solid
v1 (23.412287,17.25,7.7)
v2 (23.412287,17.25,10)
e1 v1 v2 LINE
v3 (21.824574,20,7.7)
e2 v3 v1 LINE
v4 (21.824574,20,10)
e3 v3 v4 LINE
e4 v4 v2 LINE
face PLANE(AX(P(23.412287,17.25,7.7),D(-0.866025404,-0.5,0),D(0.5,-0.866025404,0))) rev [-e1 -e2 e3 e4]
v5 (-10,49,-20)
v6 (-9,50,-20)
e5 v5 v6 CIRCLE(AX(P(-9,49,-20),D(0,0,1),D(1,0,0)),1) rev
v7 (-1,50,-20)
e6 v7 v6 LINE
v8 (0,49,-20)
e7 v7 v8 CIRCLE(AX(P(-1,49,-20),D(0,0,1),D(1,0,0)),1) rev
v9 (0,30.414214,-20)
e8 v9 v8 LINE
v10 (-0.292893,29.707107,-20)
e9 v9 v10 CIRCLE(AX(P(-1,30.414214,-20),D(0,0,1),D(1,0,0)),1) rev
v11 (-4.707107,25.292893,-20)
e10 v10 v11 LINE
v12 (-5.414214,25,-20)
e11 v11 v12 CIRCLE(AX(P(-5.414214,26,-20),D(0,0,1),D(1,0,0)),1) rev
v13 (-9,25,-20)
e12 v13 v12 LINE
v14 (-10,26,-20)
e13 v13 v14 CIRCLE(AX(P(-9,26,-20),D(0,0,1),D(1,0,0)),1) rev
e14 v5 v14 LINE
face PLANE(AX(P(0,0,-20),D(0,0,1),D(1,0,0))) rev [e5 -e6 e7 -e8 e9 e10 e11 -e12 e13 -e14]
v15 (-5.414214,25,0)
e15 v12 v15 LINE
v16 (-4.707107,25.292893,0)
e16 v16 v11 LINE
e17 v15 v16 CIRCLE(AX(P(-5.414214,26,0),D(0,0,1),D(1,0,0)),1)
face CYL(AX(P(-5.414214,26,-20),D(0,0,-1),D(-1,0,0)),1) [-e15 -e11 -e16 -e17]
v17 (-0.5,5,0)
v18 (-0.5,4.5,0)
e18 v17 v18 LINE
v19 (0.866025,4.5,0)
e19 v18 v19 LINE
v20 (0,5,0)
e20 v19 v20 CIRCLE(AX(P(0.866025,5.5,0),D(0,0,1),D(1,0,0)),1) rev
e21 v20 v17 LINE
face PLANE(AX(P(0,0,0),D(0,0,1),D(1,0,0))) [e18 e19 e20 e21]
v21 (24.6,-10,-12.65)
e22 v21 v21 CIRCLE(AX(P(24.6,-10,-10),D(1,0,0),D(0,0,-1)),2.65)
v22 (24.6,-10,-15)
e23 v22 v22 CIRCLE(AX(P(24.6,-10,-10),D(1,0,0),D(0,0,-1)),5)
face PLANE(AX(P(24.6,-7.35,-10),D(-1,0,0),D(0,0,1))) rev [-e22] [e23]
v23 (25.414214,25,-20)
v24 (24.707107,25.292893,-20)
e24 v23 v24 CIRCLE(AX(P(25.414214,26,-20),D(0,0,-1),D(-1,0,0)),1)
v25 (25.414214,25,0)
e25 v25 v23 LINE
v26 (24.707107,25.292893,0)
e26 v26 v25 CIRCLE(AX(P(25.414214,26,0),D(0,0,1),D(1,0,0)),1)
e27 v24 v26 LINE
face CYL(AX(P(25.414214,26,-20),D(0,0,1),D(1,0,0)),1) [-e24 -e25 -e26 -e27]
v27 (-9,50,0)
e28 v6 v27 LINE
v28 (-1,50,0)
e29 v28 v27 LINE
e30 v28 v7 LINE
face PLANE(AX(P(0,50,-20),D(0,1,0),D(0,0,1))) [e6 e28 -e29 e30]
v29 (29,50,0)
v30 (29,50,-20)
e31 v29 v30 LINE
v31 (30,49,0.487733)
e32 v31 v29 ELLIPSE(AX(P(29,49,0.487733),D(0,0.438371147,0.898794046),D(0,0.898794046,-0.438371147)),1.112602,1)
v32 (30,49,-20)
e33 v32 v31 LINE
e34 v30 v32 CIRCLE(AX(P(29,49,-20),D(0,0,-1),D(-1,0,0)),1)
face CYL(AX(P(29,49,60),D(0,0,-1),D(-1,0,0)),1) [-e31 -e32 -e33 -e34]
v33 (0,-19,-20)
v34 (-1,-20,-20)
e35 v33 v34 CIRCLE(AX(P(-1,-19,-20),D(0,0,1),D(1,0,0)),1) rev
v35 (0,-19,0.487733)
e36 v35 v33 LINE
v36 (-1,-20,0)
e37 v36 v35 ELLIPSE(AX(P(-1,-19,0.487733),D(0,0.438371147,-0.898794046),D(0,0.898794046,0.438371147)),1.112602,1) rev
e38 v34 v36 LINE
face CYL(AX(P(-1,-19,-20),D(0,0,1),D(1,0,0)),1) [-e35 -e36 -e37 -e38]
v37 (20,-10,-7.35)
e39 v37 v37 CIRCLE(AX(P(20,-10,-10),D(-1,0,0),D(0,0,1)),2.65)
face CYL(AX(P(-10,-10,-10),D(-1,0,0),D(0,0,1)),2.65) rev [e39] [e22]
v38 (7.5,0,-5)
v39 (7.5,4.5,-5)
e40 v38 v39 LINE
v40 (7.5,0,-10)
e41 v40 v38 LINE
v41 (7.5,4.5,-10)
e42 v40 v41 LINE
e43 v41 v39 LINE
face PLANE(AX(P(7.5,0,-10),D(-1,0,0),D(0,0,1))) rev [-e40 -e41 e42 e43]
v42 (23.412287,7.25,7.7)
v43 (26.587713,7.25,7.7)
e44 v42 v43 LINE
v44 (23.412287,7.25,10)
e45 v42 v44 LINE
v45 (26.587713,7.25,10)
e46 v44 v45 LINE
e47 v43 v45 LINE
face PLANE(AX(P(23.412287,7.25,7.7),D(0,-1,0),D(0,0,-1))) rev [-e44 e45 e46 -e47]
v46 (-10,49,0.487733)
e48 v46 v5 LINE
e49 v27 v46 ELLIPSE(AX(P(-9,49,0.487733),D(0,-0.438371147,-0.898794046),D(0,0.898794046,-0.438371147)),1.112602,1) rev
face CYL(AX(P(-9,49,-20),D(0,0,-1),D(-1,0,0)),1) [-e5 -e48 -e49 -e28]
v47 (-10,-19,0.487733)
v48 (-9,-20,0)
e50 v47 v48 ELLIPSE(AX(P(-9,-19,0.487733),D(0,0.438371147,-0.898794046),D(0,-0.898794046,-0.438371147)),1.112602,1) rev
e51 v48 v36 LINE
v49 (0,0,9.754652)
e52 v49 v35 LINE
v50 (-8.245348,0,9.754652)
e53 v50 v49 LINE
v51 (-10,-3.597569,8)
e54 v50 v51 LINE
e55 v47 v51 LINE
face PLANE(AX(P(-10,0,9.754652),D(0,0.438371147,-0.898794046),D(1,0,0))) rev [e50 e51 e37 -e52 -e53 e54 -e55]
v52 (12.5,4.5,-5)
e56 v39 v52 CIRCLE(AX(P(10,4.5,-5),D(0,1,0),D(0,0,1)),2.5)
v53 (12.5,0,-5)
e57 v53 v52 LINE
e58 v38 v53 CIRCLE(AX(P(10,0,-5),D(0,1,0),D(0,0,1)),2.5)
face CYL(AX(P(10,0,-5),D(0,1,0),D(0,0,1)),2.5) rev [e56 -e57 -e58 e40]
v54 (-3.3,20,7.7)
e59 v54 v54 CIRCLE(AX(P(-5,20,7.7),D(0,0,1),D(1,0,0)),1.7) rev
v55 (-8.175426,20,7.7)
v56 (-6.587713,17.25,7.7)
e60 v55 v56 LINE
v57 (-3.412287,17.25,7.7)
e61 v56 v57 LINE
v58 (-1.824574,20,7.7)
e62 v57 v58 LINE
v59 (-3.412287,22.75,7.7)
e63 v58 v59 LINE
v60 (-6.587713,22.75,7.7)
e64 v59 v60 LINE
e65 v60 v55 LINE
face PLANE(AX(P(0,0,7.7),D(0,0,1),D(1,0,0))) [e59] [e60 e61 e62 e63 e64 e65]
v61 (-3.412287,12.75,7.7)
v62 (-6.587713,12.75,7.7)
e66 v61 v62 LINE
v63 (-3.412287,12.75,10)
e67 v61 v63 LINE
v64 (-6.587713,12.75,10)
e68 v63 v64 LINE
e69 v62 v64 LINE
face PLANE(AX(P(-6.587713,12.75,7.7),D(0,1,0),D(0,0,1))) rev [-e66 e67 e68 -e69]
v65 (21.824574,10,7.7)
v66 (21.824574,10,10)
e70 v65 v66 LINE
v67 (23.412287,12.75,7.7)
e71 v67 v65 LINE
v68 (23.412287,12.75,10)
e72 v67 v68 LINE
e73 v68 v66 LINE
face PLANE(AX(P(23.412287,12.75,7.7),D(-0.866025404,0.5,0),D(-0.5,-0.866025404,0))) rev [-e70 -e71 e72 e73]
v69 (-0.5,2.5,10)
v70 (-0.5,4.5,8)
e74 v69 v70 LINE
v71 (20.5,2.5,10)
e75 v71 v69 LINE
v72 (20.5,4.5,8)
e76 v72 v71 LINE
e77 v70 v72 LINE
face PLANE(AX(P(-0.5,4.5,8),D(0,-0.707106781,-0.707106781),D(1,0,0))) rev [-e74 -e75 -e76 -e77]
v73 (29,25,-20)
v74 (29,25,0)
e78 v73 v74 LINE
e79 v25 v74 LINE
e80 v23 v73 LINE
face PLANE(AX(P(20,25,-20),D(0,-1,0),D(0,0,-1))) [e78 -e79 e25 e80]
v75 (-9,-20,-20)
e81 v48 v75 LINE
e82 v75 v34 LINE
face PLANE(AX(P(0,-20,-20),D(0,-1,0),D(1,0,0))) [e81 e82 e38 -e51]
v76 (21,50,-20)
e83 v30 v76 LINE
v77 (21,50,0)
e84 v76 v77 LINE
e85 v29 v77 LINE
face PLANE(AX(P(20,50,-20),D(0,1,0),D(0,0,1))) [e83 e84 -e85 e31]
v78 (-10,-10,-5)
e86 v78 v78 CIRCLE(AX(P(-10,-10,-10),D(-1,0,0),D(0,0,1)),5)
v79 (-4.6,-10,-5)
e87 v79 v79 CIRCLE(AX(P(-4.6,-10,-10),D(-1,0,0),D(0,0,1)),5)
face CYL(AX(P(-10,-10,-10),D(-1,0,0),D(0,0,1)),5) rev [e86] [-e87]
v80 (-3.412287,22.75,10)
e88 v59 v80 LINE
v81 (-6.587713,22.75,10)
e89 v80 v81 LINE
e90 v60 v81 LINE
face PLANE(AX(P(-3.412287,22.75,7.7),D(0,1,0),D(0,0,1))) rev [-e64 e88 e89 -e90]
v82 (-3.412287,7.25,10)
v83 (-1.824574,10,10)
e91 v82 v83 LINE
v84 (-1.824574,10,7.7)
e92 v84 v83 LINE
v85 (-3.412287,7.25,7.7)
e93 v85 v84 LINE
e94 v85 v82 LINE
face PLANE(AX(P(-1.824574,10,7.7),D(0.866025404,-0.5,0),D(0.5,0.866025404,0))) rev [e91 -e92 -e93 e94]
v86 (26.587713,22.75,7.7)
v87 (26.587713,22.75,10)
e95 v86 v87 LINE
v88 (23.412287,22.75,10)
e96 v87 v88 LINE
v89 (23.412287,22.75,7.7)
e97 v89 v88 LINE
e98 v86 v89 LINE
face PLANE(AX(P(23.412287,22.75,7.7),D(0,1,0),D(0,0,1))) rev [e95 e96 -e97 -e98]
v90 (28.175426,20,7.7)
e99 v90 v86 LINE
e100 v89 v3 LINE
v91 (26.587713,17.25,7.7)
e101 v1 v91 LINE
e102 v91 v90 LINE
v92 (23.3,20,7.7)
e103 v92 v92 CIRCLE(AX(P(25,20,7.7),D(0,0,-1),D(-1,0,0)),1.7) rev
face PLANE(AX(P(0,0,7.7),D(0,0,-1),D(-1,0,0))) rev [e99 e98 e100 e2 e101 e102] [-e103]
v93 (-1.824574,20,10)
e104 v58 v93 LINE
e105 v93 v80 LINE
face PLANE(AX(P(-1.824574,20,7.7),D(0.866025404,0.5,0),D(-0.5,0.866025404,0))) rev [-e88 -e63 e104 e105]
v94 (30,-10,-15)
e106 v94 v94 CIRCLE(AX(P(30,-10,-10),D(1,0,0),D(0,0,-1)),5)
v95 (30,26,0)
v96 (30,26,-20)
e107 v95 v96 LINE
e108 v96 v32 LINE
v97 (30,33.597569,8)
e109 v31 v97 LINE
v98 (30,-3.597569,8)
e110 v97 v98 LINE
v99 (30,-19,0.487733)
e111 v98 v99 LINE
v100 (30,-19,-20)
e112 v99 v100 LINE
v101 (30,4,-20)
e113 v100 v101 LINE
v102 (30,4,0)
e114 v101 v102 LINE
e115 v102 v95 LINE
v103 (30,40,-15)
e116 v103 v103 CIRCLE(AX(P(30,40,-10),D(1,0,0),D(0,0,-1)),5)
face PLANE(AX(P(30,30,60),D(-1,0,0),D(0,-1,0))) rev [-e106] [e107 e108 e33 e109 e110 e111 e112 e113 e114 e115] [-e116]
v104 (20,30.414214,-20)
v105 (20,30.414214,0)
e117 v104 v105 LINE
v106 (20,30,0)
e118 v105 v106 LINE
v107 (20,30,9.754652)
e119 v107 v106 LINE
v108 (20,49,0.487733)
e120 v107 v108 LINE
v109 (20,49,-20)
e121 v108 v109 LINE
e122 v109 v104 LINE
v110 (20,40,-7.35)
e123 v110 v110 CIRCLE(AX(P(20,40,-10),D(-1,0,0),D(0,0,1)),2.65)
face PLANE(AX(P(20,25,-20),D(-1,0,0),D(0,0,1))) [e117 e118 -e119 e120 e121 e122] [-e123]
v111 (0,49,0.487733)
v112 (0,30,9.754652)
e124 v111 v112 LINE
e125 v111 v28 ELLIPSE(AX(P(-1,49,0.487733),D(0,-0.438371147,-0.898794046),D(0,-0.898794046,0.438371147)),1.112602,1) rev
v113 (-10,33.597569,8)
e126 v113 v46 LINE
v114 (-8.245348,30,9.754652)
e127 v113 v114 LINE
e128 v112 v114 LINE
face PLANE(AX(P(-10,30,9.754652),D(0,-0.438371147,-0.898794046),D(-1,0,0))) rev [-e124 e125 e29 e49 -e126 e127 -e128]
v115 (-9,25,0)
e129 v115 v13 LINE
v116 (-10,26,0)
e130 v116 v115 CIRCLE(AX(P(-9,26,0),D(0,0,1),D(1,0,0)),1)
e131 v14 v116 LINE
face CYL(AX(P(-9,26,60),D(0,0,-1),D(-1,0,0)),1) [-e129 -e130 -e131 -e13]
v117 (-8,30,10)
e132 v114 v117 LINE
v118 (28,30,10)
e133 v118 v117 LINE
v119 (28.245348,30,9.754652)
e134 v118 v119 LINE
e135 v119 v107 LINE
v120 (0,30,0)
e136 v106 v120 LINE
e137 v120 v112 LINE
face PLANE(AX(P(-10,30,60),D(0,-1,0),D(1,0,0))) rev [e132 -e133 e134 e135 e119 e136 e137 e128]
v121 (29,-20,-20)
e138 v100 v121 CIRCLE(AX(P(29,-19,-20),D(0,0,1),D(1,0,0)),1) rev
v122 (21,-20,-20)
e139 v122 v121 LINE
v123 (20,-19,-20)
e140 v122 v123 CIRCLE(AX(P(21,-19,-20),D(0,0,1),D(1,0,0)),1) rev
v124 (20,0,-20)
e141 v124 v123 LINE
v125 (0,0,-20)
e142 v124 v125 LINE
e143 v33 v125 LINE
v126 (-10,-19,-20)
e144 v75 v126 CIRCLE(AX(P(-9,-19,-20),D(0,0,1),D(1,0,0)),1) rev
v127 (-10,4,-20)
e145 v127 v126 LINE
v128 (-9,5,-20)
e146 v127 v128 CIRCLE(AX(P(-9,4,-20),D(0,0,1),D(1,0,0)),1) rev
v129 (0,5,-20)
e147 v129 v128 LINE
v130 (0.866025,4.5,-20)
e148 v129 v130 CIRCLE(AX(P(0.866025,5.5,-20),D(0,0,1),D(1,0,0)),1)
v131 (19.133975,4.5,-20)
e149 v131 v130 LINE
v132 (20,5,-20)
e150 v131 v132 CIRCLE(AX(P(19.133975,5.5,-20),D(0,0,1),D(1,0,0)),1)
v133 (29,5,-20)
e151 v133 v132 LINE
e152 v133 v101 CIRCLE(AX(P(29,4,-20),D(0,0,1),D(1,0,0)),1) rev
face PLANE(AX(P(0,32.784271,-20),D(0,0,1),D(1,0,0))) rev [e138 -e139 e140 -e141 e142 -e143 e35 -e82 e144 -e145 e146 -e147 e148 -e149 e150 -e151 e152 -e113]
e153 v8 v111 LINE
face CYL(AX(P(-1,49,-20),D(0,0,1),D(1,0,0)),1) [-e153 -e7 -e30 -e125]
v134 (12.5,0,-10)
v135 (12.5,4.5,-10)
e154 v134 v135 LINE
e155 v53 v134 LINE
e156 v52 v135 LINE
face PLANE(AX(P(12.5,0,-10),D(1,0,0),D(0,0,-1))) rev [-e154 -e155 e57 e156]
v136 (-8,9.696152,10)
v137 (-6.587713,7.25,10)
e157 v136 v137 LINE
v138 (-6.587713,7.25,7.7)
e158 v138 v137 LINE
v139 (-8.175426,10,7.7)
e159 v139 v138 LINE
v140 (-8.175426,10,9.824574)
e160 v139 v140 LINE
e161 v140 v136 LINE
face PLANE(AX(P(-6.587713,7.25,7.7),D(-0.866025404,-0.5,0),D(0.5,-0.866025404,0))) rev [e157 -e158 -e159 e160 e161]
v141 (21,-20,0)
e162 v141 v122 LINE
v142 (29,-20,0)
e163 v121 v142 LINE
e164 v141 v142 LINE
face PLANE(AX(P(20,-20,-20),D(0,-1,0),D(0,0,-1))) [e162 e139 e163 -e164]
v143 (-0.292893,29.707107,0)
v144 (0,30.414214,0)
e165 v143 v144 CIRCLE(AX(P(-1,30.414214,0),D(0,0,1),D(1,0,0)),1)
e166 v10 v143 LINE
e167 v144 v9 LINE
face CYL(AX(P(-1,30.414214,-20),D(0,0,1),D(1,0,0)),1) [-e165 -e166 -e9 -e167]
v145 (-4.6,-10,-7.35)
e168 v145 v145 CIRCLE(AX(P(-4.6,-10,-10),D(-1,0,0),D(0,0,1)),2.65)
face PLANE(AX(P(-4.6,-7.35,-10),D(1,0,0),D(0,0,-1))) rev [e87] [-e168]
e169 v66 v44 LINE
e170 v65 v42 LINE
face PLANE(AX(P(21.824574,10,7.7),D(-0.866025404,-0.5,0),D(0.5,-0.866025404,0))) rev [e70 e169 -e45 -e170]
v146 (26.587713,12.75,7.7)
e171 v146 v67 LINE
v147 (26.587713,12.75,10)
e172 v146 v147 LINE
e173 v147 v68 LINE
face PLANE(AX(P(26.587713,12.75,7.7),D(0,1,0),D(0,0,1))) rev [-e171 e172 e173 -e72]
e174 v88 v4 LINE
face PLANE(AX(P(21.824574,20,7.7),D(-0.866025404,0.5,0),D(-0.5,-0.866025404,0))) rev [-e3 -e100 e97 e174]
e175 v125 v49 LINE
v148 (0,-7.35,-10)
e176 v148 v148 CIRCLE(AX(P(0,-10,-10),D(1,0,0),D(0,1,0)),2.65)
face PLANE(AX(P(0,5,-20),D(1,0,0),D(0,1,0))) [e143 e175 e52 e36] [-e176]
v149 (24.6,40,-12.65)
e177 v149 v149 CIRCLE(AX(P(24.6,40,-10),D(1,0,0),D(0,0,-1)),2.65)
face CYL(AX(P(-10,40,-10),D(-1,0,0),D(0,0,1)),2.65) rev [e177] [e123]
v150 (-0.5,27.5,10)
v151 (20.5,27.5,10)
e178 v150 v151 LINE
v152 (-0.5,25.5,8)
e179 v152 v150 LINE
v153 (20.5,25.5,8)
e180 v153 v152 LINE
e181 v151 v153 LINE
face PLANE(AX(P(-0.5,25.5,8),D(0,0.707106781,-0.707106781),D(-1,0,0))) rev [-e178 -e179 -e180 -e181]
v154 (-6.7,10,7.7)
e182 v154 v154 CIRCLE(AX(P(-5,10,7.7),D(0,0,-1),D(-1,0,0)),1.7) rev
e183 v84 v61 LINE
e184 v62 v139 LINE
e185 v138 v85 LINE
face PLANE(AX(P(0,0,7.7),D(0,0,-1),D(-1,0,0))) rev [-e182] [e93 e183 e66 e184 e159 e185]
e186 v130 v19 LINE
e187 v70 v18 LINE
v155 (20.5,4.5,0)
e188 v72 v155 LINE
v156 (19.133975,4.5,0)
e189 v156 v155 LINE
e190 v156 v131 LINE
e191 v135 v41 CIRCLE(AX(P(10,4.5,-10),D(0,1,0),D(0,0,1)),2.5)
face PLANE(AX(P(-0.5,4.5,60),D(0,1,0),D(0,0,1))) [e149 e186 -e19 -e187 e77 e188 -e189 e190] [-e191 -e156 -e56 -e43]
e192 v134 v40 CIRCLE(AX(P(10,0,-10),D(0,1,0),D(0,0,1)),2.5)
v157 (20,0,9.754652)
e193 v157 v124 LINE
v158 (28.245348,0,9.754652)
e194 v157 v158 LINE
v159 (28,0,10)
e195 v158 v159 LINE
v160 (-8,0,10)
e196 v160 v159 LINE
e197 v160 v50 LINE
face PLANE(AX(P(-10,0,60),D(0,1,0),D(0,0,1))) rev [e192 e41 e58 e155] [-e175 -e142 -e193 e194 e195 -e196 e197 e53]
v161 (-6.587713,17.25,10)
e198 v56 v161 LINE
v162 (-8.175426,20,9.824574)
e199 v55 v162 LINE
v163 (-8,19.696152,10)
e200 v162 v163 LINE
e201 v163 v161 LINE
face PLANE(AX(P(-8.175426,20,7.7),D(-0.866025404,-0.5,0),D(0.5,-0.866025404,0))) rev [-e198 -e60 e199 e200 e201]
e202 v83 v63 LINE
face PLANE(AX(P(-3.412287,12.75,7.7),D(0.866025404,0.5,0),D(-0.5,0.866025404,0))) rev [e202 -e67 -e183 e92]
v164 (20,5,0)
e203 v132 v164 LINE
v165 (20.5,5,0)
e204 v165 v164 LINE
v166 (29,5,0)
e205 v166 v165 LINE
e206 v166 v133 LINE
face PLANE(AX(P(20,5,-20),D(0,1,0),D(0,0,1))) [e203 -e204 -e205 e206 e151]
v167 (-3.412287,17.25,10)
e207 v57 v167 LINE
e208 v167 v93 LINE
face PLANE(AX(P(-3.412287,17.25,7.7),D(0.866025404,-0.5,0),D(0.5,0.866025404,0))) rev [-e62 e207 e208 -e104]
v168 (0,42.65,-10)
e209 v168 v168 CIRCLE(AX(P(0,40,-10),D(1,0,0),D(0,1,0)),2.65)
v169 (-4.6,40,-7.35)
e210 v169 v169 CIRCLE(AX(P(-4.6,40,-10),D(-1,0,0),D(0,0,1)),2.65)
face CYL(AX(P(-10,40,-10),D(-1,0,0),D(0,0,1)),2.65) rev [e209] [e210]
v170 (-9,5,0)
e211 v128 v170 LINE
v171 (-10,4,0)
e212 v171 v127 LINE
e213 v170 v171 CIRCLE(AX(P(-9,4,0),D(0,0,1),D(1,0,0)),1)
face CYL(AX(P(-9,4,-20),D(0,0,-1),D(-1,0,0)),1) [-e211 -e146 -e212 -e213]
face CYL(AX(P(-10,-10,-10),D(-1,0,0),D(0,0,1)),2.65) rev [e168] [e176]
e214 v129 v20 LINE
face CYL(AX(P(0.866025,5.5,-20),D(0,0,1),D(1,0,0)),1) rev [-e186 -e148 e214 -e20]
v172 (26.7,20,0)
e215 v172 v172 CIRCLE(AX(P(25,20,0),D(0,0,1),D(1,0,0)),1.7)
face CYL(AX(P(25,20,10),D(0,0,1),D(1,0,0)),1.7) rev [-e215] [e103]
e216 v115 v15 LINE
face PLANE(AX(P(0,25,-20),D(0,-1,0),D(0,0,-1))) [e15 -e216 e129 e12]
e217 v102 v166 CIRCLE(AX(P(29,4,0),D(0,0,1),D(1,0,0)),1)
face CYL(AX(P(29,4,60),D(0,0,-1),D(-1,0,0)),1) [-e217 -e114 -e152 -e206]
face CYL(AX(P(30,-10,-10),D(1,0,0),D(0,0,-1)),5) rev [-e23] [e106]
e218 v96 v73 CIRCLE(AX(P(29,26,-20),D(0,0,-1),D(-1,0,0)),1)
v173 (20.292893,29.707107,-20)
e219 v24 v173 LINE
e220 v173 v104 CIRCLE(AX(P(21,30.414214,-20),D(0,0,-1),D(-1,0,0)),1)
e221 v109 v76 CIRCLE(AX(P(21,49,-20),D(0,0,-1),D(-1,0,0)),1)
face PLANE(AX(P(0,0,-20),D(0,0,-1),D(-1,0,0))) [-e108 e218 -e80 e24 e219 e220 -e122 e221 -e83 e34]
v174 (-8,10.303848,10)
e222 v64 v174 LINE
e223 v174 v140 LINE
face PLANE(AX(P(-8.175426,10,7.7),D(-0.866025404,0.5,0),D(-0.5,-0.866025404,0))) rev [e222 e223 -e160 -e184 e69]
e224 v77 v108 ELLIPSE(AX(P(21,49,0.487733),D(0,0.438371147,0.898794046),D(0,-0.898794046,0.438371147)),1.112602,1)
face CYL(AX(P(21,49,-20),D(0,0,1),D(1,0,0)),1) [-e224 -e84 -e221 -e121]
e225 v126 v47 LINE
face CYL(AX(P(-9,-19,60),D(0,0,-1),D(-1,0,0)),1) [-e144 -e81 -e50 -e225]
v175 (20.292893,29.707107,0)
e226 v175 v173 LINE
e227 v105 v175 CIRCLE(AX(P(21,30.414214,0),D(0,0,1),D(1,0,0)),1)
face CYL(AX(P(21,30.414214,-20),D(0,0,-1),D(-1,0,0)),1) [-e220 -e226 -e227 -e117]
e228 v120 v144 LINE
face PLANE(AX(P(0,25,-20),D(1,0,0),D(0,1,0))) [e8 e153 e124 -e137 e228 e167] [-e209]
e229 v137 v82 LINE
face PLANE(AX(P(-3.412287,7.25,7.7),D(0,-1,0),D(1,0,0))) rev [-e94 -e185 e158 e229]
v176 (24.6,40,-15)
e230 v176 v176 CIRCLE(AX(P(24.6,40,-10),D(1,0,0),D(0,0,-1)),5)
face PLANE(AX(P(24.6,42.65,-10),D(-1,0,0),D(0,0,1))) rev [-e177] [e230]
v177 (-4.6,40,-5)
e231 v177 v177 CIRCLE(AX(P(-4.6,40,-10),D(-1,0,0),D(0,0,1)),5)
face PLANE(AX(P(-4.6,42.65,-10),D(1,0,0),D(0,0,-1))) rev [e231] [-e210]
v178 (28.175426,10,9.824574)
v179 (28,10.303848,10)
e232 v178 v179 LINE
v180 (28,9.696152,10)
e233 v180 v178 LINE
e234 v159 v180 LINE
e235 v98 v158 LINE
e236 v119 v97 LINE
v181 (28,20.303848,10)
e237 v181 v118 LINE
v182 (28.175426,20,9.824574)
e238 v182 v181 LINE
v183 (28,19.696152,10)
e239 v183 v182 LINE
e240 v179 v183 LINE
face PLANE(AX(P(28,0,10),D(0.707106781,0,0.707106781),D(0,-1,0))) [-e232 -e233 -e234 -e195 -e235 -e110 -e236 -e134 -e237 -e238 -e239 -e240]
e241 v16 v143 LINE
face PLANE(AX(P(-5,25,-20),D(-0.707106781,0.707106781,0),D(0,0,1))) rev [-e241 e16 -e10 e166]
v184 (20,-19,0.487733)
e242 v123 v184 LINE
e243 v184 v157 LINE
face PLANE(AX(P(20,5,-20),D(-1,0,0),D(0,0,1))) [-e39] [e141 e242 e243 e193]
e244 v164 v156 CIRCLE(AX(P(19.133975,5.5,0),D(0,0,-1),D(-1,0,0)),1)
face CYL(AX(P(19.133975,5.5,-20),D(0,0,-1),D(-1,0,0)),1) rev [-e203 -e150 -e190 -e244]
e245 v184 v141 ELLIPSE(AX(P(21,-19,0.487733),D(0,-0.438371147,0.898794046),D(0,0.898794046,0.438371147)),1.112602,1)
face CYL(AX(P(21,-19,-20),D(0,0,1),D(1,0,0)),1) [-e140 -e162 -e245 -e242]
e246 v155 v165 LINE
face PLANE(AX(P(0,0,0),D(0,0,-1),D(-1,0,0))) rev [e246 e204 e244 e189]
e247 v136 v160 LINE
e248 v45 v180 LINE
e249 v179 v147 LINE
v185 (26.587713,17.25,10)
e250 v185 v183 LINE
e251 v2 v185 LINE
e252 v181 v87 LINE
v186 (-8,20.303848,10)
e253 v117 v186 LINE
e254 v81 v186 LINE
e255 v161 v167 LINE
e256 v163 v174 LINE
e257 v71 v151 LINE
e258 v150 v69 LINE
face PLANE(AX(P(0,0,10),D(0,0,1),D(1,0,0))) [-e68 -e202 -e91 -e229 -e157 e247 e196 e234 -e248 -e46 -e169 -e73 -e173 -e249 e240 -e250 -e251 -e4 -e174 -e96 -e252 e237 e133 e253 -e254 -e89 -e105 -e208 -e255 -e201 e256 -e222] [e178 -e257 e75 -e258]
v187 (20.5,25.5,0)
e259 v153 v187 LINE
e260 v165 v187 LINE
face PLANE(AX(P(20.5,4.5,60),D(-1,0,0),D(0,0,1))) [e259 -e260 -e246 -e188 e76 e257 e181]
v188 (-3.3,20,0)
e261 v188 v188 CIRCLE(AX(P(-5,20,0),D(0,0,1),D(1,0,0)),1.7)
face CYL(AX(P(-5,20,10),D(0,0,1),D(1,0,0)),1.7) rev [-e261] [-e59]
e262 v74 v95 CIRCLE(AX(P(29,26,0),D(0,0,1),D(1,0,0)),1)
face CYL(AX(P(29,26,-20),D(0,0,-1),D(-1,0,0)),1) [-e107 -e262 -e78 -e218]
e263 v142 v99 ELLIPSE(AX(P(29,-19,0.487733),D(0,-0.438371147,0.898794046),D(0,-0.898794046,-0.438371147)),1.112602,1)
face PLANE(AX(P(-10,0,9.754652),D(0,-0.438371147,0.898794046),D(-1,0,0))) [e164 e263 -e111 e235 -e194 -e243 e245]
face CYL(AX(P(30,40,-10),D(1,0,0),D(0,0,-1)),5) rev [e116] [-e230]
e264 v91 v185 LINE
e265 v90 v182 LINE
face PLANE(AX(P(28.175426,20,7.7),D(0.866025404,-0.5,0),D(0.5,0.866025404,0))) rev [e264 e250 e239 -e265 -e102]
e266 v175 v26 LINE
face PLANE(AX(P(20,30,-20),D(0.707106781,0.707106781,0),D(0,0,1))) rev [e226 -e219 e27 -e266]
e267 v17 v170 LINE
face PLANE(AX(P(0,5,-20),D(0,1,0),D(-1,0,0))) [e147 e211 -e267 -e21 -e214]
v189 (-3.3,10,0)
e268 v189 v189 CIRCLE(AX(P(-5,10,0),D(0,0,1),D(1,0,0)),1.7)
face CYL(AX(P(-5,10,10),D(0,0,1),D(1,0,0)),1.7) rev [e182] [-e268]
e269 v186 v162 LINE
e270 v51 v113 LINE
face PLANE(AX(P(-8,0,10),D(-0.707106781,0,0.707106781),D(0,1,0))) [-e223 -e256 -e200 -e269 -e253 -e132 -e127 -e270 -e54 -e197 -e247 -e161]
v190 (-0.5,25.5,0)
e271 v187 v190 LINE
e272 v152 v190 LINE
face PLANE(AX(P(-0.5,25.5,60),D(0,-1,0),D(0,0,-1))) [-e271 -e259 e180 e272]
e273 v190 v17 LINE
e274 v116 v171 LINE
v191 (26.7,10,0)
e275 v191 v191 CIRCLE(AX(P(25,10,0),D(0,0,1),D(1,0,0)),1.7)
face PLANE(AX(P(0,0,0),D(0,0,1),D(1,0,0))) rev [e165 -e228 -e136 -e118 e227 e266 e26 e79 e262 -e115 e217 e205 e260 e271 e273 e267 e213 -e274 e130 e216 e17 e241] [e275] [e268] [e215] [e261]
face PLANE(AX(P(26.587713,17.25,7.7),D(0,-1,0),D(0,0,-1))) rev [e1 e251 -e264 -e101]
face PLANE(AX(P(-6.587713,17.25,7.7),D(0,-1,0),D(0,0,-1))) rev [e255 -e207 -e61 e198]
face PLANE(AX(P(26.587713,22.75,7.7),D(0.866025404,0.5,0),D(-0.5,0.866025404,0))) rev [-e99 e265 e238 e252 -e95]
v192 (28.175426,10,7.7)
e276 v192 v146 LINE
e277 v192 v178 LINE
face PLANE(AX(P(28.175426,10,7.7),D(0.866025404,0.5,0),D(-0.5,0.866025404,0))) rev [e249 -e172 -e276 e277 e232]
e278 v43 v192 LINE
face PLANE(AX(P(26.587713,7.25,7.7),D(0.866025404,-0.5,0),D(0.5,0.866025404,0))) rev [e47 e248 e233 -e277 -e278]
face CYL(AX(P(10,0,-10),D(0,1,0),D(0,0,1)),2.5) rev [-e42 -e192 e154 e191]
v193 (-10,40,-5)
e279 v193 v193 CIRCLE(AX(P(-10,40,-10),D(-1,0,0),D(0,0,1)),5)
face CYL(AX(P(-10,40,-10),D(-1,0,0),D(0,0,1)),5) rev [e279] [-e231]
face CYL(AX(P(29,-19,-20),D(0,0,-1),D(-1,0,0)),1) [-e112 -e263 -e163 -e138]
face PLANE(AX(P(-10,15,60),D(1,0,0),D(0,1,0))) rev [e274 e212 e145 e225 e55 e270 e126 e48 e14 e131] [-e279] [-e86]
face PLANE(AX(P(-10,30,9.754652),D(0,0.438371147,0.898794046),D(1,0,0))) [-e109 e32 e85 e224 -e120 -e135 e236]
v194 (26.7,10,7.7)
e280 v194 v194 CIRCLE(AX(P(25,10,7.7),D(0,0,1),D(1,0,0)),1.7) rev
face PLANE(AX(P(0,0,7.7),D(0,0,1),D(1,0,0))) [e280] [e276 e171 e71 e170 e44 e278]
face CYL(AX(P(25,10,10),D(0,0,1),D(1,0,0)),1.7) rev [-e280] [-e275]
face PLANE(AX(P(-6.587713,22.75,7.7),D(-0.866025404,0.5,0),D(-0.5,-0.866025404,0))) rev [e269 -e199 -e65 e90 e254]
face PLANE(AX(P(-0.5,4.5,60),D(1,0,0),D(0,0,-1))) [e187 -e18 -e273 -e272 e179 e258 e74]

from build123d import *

# Parameters (mm, degrees)
MAIN_BODY_SKETCH_W                          = 21
MAIN_BODY_SKETCH_H                          = 21
MAIN_MOUNTING_FACE_DEPTH                    = 10
EXTRUSION_BOTTOM_MOUNTING_SKETCH_W          = 20
EXTRUSION_BOTTOM_MOUNTING_SKETCH_H          = 20
BOTTOM_EXTRUSION_MOUNTING_BLOCK_DEPTH       = 4.5
TENSION_BOLT_HOLES_M3_D                     = 3.4
NUT_TRAPS_M3_DEPTH                          = 2.3
TENSION_SLOT_BOTTOM_DEPTH                   = 45.161634934
MAIN_EXTRUSION_MOUNTS_SKETCH_W              = 10
MAIN_EXTRUSION_MOUNTS_SKETCH_H              = 25
MAIN_EXTRUSION_MOUNTS_DEPTH                 = 20
EXTRUSION_MOUNTING_BOLT_HOLES_R_D           = 5.3
EXTRUSION_MOUNTING_BOLT_HOLES_R_CBORE_D     = 10
EXTRUSION_MOUNTING_BOLT_HOLES_R_CBORE_DEPTH = 5.4
EXTRUSION_MOUNTING_BOLT_HOLES_L_D           = 5.3
EXTRUSION_MOUNTING_BOLT_HOLES_L_CBORE_D     = 10
EXTRUSION_MOUNTING_BOLT_HOLES_L_CBORE_DEPTH = 5.4
CLEARANCE_CHAMFERS_SIZE                     = 5
STENGTHENING_CHAMFERS_SIZE                  = 9.754651771
STENGTHENING_CHAMFERS_SIZE_2                = 20
COSMETIC_CHAMFERS_SIZE                      = 2
PRINT_HELPER_FILLETS_R                      = 1


with BuildPart() as part:
    # Main Body Sketch → Main Mounting Face (new body)
    with BuildSketch(Plane.XY):
        Polygon((-10, 30), (30, 30), (30, 25), (30, 15), (30, 0), (-10, 0), (-10, 15), (-10, 25), align=None)
        with Locations((10, 15)):
            Rectangle(MAIN_BODY_SKETCH_W, MAIN_BODY_SKETCH_H, mode=Mode.SUBTRACT)
    extrude(amount=MAIN_MOUNTING_FACE_DEPTH)

    # Extrusion Bottom Mounting Sketch → Bottom Extrusion Mounting Block (add)
    with BuildSketch(Plane(origin=(0, 0, 0), x_dir=(1, 0, 0), z_dir=(0, 1, 0))):
        with Locations((10, 10)):
            Rectangle(EXTRUSION_BOTTOM_MOUNTING_SKETCH_W, EXTRUSION_BOTTOM_MOUNTING_SKETCH_H)
    extrude(amount=BOTTOM_EXTRUSION_MOUNTING_BLOCK_DEPTH)

    # Tension Bolt Holes (M3) (through all)
    with Locations(Plane.XY.offset(10)):
        with Locations((-5, 20), (-5, 10), (25, 10), (25, 20)):
            Hole(TENSION_BOLT_HOLES_M3_D / 2)

    # Nut Trap Sketch → Nut Traps (M3) (cut)
    with BuildSketch(Plane.XY.offset(10)):
        Polygon((-3.41228676, 22.75), (-6.58771324, 22.75), (-8.175426481, 20), (-6.58771324, 17.25), (-3.41228676, 17.25), (-1.824573519, 20), align=None)
        Polygon((-1.824573519, 10), (-3.41228676, 7.25), (-6.58771324, 7.25), (-8.175426481, 10), (-6.58771324, 12.75), (-3.41228676, 12.75), align=None)
        Polygon((23.41228676, 7.25), (26.58771324, 7.25), (28.175426481, 10), (26.58771324, 12.75), (23.41228676, 12.75), (21.824573519, 10), align=None)
        Polygon((21.824573519, 20), (23.41228676, 22.75), (26.58771324, 22.75), (28.175426481, 20), (26.58771324, 17.25), (23.41228676, 17.25), align=None)
    extrude(amount=-NUT_TRAPS_M3_DEPTH, mode=Mode.SUBTRACT)

    # Tension Slot Sketch → Tension Slot - Bottom (cut, through all)
    with BuildSketch(Plane(origin=(0, 4.5, 0), x_dir=(1, 0, 0), z_dir=(0, 1, 0))):
        with BuildLine():
            Line((12.5, 10), (12.5, 5))
            ThreePointArc((12.5, 5), (10, 2.5), (7.5, 5))
            Line((7.5, 5), (7.5, 10))
            ThreePointArc((7.5, 10), (10, 12.5), (12.5, 10))
        make_face()
    extrude(amount=-TENSION_SLOT_BOTTOM_DEPTH, mode=Mode.SUBTRACT)

    # Main Extrusion Mounts Sketch → Main Extrusion Mounts (add)
    with BuildSketch(Plane.XY):
        with Locations((25, -7.5)):
            Rectangle(MAIN_EXTRUSION_MOUNTS_SKETCH_W, MAIN_EXTRUSION_MOUNTS_SKETCH_H)
        with Locations((-5, 37.5)):
            Rectangle(MAIN_EXTRUSION_MOUNTS_SKETCH_W, MAIN_EXTRUSION_MOUNTS_SKETCH_H)
        with Locations((25, 37.5)):
            Rectangle(MAIN_EXTRUSION_MOUNTS_SKETCH_W, MAIN_EXTRUSION_MOUNTS_SKETCH_H)
        with Locations((-5, -7.5)):
            Rectangle(MAIN_EXTRUSION_MOUNTS_SKETCH_W, MAIN_EXTRUSION_MOUNTS_SKETCH_H)
    extrude(amount=-MAIN_EXTRUSION_MOUNTS_DEPTH)

    # Extrusion Mounting Bolt Holes (R) (through all)
    with Locations(Plane.ZY.offset(10)):
        with Locations((-10, 40), (-10, -10)):
            CounterBoreHole(EXTRUSION_MOUNTING_BOLT_HOLES_R_D / 2, EXTRUSION_MOUNTING_BOLT_HOLES_R_CBORE_D / 2, EXTRUSION_MOUNTING_BOLT_HOLES_R_CBORE_DEPTH)

    # Extrusion Mounting Bolt Holes (L) (through all)
    with Locations(Plane(origin=(30, 0, 0), x_dir=(0, 0, -1), z_dir=(1, 0, 0))):
        with Locations((10, 40), (10, -10)):
            CounterBoreHole(EXTRUSION_MOUNTING_BOLT_HOLES_L_D / 2, EXTRUSION_MOUNTING_BOLT_HOLES_L_CBORE_D / 2, EXTRUSION_MOUNTING_BOLT_HOLES_L_CBORE_DEPTH)

    # Clearance Chamfers
    # the kernel refuses this chamfer: 5 mm, written as the material it takes off along each edge
    with BuildSketch(Plane(origin=(0, 25, 0), x_dir=(-1, 0, 0), z_dir=(0, 0, -1))) as clearance_chamfers_piece_1:
        Polygon((CLEARANCE_CHAMFERS_SIZE, 0), (0, CLEARANCE_CHAMFERS_SIZE), (0, 0), align=None)
    extrude(amount=32.85841494, mode=Mode.SUBTRACT)
    with BuildSketch(Plane(origin=(20, 25, 0), x_dir=(1, 0, 0), z_dir=(0, 0, -1))) as clearance_chamfers_piece_2:
        Polygon((CLEARANCE_CHAMFERS_SIZE, 0), (0, -CLEARANCE_CHAMFERS_SIZE), (0, 0), align=None)
    extrude(amount=32.85841494, mode=Mode.SUBTRACT)

    # Stengthening Chamfers
    # the kernel refuses this chamfer: 20, 9.754651771 mm, written as the material it adds along each edge
    with BuildSketch(Plane(origin=(-31.805007569, 30, 0), x_dir=(0, 0, 1), z_dir=(1, 0, 0))) as stengthening_chamfers_piece_1_section:
        Polygon((STENGTHENING_CHAMFERS_SIZE, 0), (0, -STENGTHENING_CHAMFERS_SIZE_2), (0, 0), align=None)
    stengthening_chamfers_piece_1 = extrude(amount=113.610015139, mode=Mode.PRIVATE)
    stengthening_chamfers_piece_1 = split(stengthening_chamfers_piece_1, bisect_by=Plane(origin=(0, 30, 0), z_dir=(-1, 0, 0)), keep=Keep.TOP, mode=Mode.PRIVATE)
    stengthening_chamfers_piece_1 = split(stengthening_chamfers_piece_1, bisect_by=Plane(origin=(-10, 30, 0), z_dir=(1, 0, 0)), keep=Keep.TOP, mode=Mode.PRIVATE)
    add(stengthening_chamfers_piece_1)
    with BuildSketch(Plane(origin=(20, 30, 0), x_dir=(0, 0, 1), z_dir=(1, 0, 0)), Plane(origin=(-10, 30, 0), x_dir=(0, 0, 1), z_dir=(1, 0, 0))) as stengthening_chamfers_piece_2:
        Polygon((STENGTHENING_CHAMFERS_SIZE, 0), (0, -STENGTHENING_CHAMFERS_SIZE_2), (0, 0), align=None)
    extrude(amount=10)
    with BuildSketch(Plane(origin=(-61.805007569, 30, 0), x_dir=(0, 0, 1), z_dir=(1, 0, 0))) as stengthening_chamfers_piece_3_section:
        Polygon((STENGTHENING_CHAMFERS_SIZE, 0), (0, -STENGTHENING_CHAMFERS_SIZE_2), (0, 0), align=None)
    stengthening_chamfers_piece_3 = extrude(amount=113.610015139, mode=Mode.PRIVATE)
    stengthening_chamfers_piece_3 = split(stengthening_chamfers_piece_3, bisect_by=Plane(origin=(20, 30, 0), z_dir=(1, 0, 0)), keep=Keep.TOP, mode=Mode.PRIVATE)
    stengthening_chamfers_piece_3 = split(stengthening_chamfers_piece_3, bisect_by=Plane(origin=(30, 30, 0), z_dir=(-1, 0, 0)), keep=Keep.TOP, mode=Mode.PRIVATE)
    add(stengthening_chamfers_piece_3)
    with BuildSketch(Plane(origin=(30, 0, 0), x_dir=(0, -1, 0), z_dir=(-1, 0, 0)), Plane(origin=(0, 0, 0), x_dir=(0, -1, 0), z_dir=(-1, 0, 0))) as stengthening_chamfers_piece_4:
        Polygon((STENGTHENING_CHAMFERS_SIZE_2, 0), (0, STENGTHENING_CHAMFERS_SIZE), (0, 0), align=None)
    extrude(amount=10)
    with BuildSketch(Plane(origin=(81.805007569, 0, 0), x_dir=(0, -1, 0), z_dir=(-1, 0, 0))) as stengthening_chamfers_piece_5_section:
        Polygon((STENGTHENING_CHAMFERS_SIZE_2, 0), (0, STENGTHENING_CHAMFERS_SIZE), (0, 0), align=None)
    stengthening_chamfers_piece_5 = extrude(amount=113.610015139, mode=Mode.PRIVATE)
    stengthening_chamfers_piece_5 = split(stengthening_chamfers_piece_5, bisect_by=Plane(origin=(0, 0, 0), z_dir=(-1, 0, 0)), keep=Keep.TOP, mode=Mode.PRIVATE)
    stengthening_chamfers_piece_5 = split(stengthening_chamfers_piece_5, bisect_by=Plane(origin=(-10, 0, 0), z_dir=(1, 0, 0)), keep=Keep.TOP, mode=Mode.PRIVATE)
    add(stengthening_chamfers_piece_5)
    with BuildSketch(Plane(origin=(51.805007569, 0, 0), x_dir=(0, -1, 0), z_dir=(-1, 0, 0))) as stengthening_chamfers_piece_6_section:
        Polygon((STENGTHENING_CHAMFERS_SIZE_2, 0), (0, STENGTHENING_CHAMFERS_SIZE), (0, 0), align=None)
    stengthening_chamfers_piece_6 = extrude(amount=113.610015139, mode=Mode.PRIVATE)
    stengthening_chamfers_piece_6 = split(stengthening_chamfers_piece_6, bisect_by=Plane(origin=(20, 0, 0), z_dir=(1, 0, 0)), keep=Keep.TOP, mode=Mode.PRIVATE)
    stengthening_chamfers_piece_6 = split(stengthening_chamfers_piece_6, bisect_by=Plane(origin=(30, 0, 0), z_dir=(-1, 0, 0)), keep=Keep.TOP, mode=Mode.PRIVATE)
    add(stengthening_chamfers_piece_6)

    # Cosmetic Chamfers
    # the kernel refuses this chamfer: 2 mm, written as the material it takes off along each edge
    with BuildSketch(Plane(origin=(30, 35.143365976, 10), x_dir=(-1, 0, 0), z_dir=(0, -1, 0))) as cosmetic_chamfers_piece_1:
        Polygon((COSMETIC_CHAMFERS_SIZE, 0), (0, COSMETIC_CHAMFERS_SIZE), (0, 0), align=None)
    extrude(amount=40.286731952, mode=Mode.SUBTRACT)
    with BuildSketch(Plane(origin=(-10, -5.143365976, 10), x_dir=(0, 0, -1), z_dir=(0, 1, 0))) as cosmetic_chamfers_piece_2:
        Polygon((COSMETIC_CHAMFERS_SIZE, 0), (0, -COSMETIC_CHAMFERS_SIZE), (0, 0), align=None)
    extrude(amount=40.286731952, mode=Mode.SUBTRACT)
    with BuildSketch(Plane(origin=(20.5, 25.5, 10), x_dir=(0, 1, 0), z_dir=(-1, 0, 0)), Plane(origin=(-0.5, 4.5, 10), x_dir=(0, -1, 0), z_dir=(1, 0, 0))) as cosmetic_chamfers_piece_3:
        Polygon((COSMETIC_CHAMFERS_SIZE, 0), (0, COSMETIC_CHAMFERS_SIZE), (0, 0), align=None)
    extrude(amount=21, mode=Mode.SUBTRACT)

    # Print Helper Fillets
    # the kernel refuses this fillet: 1 mm, written as the material it adds along each edge
    with BuildSketch(Plane(origin=(0, 4.5, -20), x_dir=(0, 1, 0), z_dir=(0, 0, 1))) as print_helper_fillets_piece_1:
        with BuildLine():
            CenterArc((1, -0.866025404), PRINT_HELPER_FILLETS_R, 120, 60)
            Line((0, -0.866025404), (0, 0))
            Line((0, 0), (0.5, 0))
        make_face()
    extrude(amount=20)
    with BuildSketch(Plane(origin=(20, 4.5, 0), x_dir=(-1, 0, 0), z_dir=(0, 0, -1))) as print_helper_fillets_piece_2:
        with BuildLine():
            CenterArc((0.866025404, 1), PRINT_HELPER_FILLETS_R, 210, 60)
            Line((0, 0.5), (0, 0))
            Line((0, 0), (0.866025404, 0))
        make_face()
    extrude(amount=20)
    # the kernel refuses this fillet: 1 mm, written as the material it takes off along each edge
    with BuildSketch(Plane(origin=(20, 50, 2.5), x_dir=(1, 0, 0), z_dir=(0, 0, -1)), Plane(origin=(30, -20, 2.5), x_dir=(-1, 0, 0), z_dir=(0, 0, -1)), Plane(origin=(0, 50, 2.5), x_dir=(0, -1, 0), z_dir=(0, 0, -1)), Plane(origin=(-10, 50, 2.5), x_dir=(1, 0, 0), z_dir=(0, 0, -1))) as print_helper_fillets_2_piece_1:
        with BuildLine():
            CenterArc((PRINT_HELPER_FILLETS_R, PRINT_HELPER_FILLETS_R), PRINT_HELPER_FILLETS_R, 180, 90)
            Line((0, PRINT_HELPER_FILLETS_R), (0, 0))
            Line((0, 0), (PRINT_HELPER_FILLETS_R, 0))
        make_face()
    extrude(amount=25, mode=Mode.SUBTRACT)
    with BuildSketch(Plane(origin=(30, 50, 2.5), x_dir=(-1, 0, 0), z_dir=(0, 0, -1)), Plane(origin=(20, -20, 2.5), x_dir=(1, 0, 0), z_dir=(0, 0, -1)), Plane(origin=(0, -20, 2.5), x_dir=(0, 1, 0), z_dir=(0, 0, -1)), Plane(origin=(-10, -20, 2.5), x_dir=(1, 0, 0), z_dir=(0, 0, -1))) as print_helper_fillets_2_piece_2:
        with BuildLine():
            CenterArc((PRINT_HELPER_FILLETS_R, -PRINT_HELPER_FILLETS_R), PRINT_HELPER_FILLETS_R, 90, 90)
            Line((0, -PRINT_HELPER_FILLETS_R), (0, 0))
            Line((0, 0), (PRINT_HELPER_FILLETS_R, 0))
        make_face()
    extrude(amount=25, mode=Mode.SUBTRACT)
    with BuildSketch(Plane(origin=(30, 25, 0), x_dir=(-1, 0, 0), z_dir=(0, 0, -1))) as print_helper_fillets_2_piece_3:
        with BuildLine():
            CenterArc((PRINT_HELPER_FILLETS_R, PRINT_HELPER_FILLETS_R), PRINT_HELPER_FILLETS_R, 180, 90)
            Line((0, PRINT_HELPER_FILLETS_R), (0, 0))
            Line((0, 0), (PRINT_HELPER_FILLETS_R, 0))
        make_face()
    extrude(amount=22.5, mode=Mode.SUBTRACT)
    with BuildSketch(Plane(origin=(30, 5, 0), x_dir=(-1, 0, 0), z_dir=(0, 0, -1)), Plane(origin=(-10, 5, 0), x_dir=(0, -1, 0), z_dir=(0, 0, -1)), Plane(origin=(-10, 25, 0), x_dir=(1, 0, 0), z_dir=(0, 0, -1))) as print_helper_fillets_2_piece_4:
        with BuildLine():
            CenterArc((PRINT_HELPER_FILLETS_R, -PRINT_HELPER_FILLETS_R), PRINT_HELPER_FILLETS_R, 90, 90)
            Line((0, -PRINT_HELPER_FILLETS_R), (0, 0))
            Line((0, 0), (PRINT_HELPER_FILLETS_R, 0))
        make_face()
    extrude(amount=22.5, mode=Mode.SUBTRACT)
    with BuildSketch(Plane(origin=(-5, 25, 0), x_dir=(0.7071067811865475, 0.7071067811865475, 0), z_dir=(0, 0, -1)), Plane(origin=(0, 30, 0), x_dir=(0, 1, 0), z_dir=(0, 0, -1)), Plane(origin=(25, 25, 0), x_dir=(1, 0, 0), z_dir=(0, 0, -1))) as print_helper_fillets_2_piece_5:
        with BuildLine():
            CenterArc((PRINT_HELPER_FILLETS_R * 0.414213562373, -PRINT_HELPER_FILLETS_R), PRINT_HELPER_FILLETS_R, 90, 45)
            Line((-PRINT_HELPER_FILLETS_R * 0.292893218813, -PRINT_HELPER_FILLETS_R * 0.292893218813), (0, 0))
            Line((0, 0), (PRINT_HELPER_FILLETS_R * 0.414213562373, 0))
        make_face()
    extrude(amount=21.035533906, mode=Mode.SUBTRACT)
    with BuildSketch(Plane(origin=(20, 30, 0), x_dir=(0, 1, 0), z_dir=(0, 0, -1))) as print_helper_fillets_2_piece_6:
        with BuildLine():
            CenterArc((PRINT_HELPER_FILLETS_R * 0.414213562373, PRINT_HELPER_FILLETS_R), PRINT_HELPER_FILLETS_R, 225, 45)
            Line((-PRINT_HELPER_FILLETS_R * 0.292893218813, PRINT_HELPER_FILLETS_R * 0.292893218813), (0, 0))
            Line((0, 0), (PRINT_HELPER_FILLETS_R * 0.414213562373, 0))
        make_face()
    extrude(amount=21.035533906, mode=Mode.SUBTRACT)


solid = part.part
